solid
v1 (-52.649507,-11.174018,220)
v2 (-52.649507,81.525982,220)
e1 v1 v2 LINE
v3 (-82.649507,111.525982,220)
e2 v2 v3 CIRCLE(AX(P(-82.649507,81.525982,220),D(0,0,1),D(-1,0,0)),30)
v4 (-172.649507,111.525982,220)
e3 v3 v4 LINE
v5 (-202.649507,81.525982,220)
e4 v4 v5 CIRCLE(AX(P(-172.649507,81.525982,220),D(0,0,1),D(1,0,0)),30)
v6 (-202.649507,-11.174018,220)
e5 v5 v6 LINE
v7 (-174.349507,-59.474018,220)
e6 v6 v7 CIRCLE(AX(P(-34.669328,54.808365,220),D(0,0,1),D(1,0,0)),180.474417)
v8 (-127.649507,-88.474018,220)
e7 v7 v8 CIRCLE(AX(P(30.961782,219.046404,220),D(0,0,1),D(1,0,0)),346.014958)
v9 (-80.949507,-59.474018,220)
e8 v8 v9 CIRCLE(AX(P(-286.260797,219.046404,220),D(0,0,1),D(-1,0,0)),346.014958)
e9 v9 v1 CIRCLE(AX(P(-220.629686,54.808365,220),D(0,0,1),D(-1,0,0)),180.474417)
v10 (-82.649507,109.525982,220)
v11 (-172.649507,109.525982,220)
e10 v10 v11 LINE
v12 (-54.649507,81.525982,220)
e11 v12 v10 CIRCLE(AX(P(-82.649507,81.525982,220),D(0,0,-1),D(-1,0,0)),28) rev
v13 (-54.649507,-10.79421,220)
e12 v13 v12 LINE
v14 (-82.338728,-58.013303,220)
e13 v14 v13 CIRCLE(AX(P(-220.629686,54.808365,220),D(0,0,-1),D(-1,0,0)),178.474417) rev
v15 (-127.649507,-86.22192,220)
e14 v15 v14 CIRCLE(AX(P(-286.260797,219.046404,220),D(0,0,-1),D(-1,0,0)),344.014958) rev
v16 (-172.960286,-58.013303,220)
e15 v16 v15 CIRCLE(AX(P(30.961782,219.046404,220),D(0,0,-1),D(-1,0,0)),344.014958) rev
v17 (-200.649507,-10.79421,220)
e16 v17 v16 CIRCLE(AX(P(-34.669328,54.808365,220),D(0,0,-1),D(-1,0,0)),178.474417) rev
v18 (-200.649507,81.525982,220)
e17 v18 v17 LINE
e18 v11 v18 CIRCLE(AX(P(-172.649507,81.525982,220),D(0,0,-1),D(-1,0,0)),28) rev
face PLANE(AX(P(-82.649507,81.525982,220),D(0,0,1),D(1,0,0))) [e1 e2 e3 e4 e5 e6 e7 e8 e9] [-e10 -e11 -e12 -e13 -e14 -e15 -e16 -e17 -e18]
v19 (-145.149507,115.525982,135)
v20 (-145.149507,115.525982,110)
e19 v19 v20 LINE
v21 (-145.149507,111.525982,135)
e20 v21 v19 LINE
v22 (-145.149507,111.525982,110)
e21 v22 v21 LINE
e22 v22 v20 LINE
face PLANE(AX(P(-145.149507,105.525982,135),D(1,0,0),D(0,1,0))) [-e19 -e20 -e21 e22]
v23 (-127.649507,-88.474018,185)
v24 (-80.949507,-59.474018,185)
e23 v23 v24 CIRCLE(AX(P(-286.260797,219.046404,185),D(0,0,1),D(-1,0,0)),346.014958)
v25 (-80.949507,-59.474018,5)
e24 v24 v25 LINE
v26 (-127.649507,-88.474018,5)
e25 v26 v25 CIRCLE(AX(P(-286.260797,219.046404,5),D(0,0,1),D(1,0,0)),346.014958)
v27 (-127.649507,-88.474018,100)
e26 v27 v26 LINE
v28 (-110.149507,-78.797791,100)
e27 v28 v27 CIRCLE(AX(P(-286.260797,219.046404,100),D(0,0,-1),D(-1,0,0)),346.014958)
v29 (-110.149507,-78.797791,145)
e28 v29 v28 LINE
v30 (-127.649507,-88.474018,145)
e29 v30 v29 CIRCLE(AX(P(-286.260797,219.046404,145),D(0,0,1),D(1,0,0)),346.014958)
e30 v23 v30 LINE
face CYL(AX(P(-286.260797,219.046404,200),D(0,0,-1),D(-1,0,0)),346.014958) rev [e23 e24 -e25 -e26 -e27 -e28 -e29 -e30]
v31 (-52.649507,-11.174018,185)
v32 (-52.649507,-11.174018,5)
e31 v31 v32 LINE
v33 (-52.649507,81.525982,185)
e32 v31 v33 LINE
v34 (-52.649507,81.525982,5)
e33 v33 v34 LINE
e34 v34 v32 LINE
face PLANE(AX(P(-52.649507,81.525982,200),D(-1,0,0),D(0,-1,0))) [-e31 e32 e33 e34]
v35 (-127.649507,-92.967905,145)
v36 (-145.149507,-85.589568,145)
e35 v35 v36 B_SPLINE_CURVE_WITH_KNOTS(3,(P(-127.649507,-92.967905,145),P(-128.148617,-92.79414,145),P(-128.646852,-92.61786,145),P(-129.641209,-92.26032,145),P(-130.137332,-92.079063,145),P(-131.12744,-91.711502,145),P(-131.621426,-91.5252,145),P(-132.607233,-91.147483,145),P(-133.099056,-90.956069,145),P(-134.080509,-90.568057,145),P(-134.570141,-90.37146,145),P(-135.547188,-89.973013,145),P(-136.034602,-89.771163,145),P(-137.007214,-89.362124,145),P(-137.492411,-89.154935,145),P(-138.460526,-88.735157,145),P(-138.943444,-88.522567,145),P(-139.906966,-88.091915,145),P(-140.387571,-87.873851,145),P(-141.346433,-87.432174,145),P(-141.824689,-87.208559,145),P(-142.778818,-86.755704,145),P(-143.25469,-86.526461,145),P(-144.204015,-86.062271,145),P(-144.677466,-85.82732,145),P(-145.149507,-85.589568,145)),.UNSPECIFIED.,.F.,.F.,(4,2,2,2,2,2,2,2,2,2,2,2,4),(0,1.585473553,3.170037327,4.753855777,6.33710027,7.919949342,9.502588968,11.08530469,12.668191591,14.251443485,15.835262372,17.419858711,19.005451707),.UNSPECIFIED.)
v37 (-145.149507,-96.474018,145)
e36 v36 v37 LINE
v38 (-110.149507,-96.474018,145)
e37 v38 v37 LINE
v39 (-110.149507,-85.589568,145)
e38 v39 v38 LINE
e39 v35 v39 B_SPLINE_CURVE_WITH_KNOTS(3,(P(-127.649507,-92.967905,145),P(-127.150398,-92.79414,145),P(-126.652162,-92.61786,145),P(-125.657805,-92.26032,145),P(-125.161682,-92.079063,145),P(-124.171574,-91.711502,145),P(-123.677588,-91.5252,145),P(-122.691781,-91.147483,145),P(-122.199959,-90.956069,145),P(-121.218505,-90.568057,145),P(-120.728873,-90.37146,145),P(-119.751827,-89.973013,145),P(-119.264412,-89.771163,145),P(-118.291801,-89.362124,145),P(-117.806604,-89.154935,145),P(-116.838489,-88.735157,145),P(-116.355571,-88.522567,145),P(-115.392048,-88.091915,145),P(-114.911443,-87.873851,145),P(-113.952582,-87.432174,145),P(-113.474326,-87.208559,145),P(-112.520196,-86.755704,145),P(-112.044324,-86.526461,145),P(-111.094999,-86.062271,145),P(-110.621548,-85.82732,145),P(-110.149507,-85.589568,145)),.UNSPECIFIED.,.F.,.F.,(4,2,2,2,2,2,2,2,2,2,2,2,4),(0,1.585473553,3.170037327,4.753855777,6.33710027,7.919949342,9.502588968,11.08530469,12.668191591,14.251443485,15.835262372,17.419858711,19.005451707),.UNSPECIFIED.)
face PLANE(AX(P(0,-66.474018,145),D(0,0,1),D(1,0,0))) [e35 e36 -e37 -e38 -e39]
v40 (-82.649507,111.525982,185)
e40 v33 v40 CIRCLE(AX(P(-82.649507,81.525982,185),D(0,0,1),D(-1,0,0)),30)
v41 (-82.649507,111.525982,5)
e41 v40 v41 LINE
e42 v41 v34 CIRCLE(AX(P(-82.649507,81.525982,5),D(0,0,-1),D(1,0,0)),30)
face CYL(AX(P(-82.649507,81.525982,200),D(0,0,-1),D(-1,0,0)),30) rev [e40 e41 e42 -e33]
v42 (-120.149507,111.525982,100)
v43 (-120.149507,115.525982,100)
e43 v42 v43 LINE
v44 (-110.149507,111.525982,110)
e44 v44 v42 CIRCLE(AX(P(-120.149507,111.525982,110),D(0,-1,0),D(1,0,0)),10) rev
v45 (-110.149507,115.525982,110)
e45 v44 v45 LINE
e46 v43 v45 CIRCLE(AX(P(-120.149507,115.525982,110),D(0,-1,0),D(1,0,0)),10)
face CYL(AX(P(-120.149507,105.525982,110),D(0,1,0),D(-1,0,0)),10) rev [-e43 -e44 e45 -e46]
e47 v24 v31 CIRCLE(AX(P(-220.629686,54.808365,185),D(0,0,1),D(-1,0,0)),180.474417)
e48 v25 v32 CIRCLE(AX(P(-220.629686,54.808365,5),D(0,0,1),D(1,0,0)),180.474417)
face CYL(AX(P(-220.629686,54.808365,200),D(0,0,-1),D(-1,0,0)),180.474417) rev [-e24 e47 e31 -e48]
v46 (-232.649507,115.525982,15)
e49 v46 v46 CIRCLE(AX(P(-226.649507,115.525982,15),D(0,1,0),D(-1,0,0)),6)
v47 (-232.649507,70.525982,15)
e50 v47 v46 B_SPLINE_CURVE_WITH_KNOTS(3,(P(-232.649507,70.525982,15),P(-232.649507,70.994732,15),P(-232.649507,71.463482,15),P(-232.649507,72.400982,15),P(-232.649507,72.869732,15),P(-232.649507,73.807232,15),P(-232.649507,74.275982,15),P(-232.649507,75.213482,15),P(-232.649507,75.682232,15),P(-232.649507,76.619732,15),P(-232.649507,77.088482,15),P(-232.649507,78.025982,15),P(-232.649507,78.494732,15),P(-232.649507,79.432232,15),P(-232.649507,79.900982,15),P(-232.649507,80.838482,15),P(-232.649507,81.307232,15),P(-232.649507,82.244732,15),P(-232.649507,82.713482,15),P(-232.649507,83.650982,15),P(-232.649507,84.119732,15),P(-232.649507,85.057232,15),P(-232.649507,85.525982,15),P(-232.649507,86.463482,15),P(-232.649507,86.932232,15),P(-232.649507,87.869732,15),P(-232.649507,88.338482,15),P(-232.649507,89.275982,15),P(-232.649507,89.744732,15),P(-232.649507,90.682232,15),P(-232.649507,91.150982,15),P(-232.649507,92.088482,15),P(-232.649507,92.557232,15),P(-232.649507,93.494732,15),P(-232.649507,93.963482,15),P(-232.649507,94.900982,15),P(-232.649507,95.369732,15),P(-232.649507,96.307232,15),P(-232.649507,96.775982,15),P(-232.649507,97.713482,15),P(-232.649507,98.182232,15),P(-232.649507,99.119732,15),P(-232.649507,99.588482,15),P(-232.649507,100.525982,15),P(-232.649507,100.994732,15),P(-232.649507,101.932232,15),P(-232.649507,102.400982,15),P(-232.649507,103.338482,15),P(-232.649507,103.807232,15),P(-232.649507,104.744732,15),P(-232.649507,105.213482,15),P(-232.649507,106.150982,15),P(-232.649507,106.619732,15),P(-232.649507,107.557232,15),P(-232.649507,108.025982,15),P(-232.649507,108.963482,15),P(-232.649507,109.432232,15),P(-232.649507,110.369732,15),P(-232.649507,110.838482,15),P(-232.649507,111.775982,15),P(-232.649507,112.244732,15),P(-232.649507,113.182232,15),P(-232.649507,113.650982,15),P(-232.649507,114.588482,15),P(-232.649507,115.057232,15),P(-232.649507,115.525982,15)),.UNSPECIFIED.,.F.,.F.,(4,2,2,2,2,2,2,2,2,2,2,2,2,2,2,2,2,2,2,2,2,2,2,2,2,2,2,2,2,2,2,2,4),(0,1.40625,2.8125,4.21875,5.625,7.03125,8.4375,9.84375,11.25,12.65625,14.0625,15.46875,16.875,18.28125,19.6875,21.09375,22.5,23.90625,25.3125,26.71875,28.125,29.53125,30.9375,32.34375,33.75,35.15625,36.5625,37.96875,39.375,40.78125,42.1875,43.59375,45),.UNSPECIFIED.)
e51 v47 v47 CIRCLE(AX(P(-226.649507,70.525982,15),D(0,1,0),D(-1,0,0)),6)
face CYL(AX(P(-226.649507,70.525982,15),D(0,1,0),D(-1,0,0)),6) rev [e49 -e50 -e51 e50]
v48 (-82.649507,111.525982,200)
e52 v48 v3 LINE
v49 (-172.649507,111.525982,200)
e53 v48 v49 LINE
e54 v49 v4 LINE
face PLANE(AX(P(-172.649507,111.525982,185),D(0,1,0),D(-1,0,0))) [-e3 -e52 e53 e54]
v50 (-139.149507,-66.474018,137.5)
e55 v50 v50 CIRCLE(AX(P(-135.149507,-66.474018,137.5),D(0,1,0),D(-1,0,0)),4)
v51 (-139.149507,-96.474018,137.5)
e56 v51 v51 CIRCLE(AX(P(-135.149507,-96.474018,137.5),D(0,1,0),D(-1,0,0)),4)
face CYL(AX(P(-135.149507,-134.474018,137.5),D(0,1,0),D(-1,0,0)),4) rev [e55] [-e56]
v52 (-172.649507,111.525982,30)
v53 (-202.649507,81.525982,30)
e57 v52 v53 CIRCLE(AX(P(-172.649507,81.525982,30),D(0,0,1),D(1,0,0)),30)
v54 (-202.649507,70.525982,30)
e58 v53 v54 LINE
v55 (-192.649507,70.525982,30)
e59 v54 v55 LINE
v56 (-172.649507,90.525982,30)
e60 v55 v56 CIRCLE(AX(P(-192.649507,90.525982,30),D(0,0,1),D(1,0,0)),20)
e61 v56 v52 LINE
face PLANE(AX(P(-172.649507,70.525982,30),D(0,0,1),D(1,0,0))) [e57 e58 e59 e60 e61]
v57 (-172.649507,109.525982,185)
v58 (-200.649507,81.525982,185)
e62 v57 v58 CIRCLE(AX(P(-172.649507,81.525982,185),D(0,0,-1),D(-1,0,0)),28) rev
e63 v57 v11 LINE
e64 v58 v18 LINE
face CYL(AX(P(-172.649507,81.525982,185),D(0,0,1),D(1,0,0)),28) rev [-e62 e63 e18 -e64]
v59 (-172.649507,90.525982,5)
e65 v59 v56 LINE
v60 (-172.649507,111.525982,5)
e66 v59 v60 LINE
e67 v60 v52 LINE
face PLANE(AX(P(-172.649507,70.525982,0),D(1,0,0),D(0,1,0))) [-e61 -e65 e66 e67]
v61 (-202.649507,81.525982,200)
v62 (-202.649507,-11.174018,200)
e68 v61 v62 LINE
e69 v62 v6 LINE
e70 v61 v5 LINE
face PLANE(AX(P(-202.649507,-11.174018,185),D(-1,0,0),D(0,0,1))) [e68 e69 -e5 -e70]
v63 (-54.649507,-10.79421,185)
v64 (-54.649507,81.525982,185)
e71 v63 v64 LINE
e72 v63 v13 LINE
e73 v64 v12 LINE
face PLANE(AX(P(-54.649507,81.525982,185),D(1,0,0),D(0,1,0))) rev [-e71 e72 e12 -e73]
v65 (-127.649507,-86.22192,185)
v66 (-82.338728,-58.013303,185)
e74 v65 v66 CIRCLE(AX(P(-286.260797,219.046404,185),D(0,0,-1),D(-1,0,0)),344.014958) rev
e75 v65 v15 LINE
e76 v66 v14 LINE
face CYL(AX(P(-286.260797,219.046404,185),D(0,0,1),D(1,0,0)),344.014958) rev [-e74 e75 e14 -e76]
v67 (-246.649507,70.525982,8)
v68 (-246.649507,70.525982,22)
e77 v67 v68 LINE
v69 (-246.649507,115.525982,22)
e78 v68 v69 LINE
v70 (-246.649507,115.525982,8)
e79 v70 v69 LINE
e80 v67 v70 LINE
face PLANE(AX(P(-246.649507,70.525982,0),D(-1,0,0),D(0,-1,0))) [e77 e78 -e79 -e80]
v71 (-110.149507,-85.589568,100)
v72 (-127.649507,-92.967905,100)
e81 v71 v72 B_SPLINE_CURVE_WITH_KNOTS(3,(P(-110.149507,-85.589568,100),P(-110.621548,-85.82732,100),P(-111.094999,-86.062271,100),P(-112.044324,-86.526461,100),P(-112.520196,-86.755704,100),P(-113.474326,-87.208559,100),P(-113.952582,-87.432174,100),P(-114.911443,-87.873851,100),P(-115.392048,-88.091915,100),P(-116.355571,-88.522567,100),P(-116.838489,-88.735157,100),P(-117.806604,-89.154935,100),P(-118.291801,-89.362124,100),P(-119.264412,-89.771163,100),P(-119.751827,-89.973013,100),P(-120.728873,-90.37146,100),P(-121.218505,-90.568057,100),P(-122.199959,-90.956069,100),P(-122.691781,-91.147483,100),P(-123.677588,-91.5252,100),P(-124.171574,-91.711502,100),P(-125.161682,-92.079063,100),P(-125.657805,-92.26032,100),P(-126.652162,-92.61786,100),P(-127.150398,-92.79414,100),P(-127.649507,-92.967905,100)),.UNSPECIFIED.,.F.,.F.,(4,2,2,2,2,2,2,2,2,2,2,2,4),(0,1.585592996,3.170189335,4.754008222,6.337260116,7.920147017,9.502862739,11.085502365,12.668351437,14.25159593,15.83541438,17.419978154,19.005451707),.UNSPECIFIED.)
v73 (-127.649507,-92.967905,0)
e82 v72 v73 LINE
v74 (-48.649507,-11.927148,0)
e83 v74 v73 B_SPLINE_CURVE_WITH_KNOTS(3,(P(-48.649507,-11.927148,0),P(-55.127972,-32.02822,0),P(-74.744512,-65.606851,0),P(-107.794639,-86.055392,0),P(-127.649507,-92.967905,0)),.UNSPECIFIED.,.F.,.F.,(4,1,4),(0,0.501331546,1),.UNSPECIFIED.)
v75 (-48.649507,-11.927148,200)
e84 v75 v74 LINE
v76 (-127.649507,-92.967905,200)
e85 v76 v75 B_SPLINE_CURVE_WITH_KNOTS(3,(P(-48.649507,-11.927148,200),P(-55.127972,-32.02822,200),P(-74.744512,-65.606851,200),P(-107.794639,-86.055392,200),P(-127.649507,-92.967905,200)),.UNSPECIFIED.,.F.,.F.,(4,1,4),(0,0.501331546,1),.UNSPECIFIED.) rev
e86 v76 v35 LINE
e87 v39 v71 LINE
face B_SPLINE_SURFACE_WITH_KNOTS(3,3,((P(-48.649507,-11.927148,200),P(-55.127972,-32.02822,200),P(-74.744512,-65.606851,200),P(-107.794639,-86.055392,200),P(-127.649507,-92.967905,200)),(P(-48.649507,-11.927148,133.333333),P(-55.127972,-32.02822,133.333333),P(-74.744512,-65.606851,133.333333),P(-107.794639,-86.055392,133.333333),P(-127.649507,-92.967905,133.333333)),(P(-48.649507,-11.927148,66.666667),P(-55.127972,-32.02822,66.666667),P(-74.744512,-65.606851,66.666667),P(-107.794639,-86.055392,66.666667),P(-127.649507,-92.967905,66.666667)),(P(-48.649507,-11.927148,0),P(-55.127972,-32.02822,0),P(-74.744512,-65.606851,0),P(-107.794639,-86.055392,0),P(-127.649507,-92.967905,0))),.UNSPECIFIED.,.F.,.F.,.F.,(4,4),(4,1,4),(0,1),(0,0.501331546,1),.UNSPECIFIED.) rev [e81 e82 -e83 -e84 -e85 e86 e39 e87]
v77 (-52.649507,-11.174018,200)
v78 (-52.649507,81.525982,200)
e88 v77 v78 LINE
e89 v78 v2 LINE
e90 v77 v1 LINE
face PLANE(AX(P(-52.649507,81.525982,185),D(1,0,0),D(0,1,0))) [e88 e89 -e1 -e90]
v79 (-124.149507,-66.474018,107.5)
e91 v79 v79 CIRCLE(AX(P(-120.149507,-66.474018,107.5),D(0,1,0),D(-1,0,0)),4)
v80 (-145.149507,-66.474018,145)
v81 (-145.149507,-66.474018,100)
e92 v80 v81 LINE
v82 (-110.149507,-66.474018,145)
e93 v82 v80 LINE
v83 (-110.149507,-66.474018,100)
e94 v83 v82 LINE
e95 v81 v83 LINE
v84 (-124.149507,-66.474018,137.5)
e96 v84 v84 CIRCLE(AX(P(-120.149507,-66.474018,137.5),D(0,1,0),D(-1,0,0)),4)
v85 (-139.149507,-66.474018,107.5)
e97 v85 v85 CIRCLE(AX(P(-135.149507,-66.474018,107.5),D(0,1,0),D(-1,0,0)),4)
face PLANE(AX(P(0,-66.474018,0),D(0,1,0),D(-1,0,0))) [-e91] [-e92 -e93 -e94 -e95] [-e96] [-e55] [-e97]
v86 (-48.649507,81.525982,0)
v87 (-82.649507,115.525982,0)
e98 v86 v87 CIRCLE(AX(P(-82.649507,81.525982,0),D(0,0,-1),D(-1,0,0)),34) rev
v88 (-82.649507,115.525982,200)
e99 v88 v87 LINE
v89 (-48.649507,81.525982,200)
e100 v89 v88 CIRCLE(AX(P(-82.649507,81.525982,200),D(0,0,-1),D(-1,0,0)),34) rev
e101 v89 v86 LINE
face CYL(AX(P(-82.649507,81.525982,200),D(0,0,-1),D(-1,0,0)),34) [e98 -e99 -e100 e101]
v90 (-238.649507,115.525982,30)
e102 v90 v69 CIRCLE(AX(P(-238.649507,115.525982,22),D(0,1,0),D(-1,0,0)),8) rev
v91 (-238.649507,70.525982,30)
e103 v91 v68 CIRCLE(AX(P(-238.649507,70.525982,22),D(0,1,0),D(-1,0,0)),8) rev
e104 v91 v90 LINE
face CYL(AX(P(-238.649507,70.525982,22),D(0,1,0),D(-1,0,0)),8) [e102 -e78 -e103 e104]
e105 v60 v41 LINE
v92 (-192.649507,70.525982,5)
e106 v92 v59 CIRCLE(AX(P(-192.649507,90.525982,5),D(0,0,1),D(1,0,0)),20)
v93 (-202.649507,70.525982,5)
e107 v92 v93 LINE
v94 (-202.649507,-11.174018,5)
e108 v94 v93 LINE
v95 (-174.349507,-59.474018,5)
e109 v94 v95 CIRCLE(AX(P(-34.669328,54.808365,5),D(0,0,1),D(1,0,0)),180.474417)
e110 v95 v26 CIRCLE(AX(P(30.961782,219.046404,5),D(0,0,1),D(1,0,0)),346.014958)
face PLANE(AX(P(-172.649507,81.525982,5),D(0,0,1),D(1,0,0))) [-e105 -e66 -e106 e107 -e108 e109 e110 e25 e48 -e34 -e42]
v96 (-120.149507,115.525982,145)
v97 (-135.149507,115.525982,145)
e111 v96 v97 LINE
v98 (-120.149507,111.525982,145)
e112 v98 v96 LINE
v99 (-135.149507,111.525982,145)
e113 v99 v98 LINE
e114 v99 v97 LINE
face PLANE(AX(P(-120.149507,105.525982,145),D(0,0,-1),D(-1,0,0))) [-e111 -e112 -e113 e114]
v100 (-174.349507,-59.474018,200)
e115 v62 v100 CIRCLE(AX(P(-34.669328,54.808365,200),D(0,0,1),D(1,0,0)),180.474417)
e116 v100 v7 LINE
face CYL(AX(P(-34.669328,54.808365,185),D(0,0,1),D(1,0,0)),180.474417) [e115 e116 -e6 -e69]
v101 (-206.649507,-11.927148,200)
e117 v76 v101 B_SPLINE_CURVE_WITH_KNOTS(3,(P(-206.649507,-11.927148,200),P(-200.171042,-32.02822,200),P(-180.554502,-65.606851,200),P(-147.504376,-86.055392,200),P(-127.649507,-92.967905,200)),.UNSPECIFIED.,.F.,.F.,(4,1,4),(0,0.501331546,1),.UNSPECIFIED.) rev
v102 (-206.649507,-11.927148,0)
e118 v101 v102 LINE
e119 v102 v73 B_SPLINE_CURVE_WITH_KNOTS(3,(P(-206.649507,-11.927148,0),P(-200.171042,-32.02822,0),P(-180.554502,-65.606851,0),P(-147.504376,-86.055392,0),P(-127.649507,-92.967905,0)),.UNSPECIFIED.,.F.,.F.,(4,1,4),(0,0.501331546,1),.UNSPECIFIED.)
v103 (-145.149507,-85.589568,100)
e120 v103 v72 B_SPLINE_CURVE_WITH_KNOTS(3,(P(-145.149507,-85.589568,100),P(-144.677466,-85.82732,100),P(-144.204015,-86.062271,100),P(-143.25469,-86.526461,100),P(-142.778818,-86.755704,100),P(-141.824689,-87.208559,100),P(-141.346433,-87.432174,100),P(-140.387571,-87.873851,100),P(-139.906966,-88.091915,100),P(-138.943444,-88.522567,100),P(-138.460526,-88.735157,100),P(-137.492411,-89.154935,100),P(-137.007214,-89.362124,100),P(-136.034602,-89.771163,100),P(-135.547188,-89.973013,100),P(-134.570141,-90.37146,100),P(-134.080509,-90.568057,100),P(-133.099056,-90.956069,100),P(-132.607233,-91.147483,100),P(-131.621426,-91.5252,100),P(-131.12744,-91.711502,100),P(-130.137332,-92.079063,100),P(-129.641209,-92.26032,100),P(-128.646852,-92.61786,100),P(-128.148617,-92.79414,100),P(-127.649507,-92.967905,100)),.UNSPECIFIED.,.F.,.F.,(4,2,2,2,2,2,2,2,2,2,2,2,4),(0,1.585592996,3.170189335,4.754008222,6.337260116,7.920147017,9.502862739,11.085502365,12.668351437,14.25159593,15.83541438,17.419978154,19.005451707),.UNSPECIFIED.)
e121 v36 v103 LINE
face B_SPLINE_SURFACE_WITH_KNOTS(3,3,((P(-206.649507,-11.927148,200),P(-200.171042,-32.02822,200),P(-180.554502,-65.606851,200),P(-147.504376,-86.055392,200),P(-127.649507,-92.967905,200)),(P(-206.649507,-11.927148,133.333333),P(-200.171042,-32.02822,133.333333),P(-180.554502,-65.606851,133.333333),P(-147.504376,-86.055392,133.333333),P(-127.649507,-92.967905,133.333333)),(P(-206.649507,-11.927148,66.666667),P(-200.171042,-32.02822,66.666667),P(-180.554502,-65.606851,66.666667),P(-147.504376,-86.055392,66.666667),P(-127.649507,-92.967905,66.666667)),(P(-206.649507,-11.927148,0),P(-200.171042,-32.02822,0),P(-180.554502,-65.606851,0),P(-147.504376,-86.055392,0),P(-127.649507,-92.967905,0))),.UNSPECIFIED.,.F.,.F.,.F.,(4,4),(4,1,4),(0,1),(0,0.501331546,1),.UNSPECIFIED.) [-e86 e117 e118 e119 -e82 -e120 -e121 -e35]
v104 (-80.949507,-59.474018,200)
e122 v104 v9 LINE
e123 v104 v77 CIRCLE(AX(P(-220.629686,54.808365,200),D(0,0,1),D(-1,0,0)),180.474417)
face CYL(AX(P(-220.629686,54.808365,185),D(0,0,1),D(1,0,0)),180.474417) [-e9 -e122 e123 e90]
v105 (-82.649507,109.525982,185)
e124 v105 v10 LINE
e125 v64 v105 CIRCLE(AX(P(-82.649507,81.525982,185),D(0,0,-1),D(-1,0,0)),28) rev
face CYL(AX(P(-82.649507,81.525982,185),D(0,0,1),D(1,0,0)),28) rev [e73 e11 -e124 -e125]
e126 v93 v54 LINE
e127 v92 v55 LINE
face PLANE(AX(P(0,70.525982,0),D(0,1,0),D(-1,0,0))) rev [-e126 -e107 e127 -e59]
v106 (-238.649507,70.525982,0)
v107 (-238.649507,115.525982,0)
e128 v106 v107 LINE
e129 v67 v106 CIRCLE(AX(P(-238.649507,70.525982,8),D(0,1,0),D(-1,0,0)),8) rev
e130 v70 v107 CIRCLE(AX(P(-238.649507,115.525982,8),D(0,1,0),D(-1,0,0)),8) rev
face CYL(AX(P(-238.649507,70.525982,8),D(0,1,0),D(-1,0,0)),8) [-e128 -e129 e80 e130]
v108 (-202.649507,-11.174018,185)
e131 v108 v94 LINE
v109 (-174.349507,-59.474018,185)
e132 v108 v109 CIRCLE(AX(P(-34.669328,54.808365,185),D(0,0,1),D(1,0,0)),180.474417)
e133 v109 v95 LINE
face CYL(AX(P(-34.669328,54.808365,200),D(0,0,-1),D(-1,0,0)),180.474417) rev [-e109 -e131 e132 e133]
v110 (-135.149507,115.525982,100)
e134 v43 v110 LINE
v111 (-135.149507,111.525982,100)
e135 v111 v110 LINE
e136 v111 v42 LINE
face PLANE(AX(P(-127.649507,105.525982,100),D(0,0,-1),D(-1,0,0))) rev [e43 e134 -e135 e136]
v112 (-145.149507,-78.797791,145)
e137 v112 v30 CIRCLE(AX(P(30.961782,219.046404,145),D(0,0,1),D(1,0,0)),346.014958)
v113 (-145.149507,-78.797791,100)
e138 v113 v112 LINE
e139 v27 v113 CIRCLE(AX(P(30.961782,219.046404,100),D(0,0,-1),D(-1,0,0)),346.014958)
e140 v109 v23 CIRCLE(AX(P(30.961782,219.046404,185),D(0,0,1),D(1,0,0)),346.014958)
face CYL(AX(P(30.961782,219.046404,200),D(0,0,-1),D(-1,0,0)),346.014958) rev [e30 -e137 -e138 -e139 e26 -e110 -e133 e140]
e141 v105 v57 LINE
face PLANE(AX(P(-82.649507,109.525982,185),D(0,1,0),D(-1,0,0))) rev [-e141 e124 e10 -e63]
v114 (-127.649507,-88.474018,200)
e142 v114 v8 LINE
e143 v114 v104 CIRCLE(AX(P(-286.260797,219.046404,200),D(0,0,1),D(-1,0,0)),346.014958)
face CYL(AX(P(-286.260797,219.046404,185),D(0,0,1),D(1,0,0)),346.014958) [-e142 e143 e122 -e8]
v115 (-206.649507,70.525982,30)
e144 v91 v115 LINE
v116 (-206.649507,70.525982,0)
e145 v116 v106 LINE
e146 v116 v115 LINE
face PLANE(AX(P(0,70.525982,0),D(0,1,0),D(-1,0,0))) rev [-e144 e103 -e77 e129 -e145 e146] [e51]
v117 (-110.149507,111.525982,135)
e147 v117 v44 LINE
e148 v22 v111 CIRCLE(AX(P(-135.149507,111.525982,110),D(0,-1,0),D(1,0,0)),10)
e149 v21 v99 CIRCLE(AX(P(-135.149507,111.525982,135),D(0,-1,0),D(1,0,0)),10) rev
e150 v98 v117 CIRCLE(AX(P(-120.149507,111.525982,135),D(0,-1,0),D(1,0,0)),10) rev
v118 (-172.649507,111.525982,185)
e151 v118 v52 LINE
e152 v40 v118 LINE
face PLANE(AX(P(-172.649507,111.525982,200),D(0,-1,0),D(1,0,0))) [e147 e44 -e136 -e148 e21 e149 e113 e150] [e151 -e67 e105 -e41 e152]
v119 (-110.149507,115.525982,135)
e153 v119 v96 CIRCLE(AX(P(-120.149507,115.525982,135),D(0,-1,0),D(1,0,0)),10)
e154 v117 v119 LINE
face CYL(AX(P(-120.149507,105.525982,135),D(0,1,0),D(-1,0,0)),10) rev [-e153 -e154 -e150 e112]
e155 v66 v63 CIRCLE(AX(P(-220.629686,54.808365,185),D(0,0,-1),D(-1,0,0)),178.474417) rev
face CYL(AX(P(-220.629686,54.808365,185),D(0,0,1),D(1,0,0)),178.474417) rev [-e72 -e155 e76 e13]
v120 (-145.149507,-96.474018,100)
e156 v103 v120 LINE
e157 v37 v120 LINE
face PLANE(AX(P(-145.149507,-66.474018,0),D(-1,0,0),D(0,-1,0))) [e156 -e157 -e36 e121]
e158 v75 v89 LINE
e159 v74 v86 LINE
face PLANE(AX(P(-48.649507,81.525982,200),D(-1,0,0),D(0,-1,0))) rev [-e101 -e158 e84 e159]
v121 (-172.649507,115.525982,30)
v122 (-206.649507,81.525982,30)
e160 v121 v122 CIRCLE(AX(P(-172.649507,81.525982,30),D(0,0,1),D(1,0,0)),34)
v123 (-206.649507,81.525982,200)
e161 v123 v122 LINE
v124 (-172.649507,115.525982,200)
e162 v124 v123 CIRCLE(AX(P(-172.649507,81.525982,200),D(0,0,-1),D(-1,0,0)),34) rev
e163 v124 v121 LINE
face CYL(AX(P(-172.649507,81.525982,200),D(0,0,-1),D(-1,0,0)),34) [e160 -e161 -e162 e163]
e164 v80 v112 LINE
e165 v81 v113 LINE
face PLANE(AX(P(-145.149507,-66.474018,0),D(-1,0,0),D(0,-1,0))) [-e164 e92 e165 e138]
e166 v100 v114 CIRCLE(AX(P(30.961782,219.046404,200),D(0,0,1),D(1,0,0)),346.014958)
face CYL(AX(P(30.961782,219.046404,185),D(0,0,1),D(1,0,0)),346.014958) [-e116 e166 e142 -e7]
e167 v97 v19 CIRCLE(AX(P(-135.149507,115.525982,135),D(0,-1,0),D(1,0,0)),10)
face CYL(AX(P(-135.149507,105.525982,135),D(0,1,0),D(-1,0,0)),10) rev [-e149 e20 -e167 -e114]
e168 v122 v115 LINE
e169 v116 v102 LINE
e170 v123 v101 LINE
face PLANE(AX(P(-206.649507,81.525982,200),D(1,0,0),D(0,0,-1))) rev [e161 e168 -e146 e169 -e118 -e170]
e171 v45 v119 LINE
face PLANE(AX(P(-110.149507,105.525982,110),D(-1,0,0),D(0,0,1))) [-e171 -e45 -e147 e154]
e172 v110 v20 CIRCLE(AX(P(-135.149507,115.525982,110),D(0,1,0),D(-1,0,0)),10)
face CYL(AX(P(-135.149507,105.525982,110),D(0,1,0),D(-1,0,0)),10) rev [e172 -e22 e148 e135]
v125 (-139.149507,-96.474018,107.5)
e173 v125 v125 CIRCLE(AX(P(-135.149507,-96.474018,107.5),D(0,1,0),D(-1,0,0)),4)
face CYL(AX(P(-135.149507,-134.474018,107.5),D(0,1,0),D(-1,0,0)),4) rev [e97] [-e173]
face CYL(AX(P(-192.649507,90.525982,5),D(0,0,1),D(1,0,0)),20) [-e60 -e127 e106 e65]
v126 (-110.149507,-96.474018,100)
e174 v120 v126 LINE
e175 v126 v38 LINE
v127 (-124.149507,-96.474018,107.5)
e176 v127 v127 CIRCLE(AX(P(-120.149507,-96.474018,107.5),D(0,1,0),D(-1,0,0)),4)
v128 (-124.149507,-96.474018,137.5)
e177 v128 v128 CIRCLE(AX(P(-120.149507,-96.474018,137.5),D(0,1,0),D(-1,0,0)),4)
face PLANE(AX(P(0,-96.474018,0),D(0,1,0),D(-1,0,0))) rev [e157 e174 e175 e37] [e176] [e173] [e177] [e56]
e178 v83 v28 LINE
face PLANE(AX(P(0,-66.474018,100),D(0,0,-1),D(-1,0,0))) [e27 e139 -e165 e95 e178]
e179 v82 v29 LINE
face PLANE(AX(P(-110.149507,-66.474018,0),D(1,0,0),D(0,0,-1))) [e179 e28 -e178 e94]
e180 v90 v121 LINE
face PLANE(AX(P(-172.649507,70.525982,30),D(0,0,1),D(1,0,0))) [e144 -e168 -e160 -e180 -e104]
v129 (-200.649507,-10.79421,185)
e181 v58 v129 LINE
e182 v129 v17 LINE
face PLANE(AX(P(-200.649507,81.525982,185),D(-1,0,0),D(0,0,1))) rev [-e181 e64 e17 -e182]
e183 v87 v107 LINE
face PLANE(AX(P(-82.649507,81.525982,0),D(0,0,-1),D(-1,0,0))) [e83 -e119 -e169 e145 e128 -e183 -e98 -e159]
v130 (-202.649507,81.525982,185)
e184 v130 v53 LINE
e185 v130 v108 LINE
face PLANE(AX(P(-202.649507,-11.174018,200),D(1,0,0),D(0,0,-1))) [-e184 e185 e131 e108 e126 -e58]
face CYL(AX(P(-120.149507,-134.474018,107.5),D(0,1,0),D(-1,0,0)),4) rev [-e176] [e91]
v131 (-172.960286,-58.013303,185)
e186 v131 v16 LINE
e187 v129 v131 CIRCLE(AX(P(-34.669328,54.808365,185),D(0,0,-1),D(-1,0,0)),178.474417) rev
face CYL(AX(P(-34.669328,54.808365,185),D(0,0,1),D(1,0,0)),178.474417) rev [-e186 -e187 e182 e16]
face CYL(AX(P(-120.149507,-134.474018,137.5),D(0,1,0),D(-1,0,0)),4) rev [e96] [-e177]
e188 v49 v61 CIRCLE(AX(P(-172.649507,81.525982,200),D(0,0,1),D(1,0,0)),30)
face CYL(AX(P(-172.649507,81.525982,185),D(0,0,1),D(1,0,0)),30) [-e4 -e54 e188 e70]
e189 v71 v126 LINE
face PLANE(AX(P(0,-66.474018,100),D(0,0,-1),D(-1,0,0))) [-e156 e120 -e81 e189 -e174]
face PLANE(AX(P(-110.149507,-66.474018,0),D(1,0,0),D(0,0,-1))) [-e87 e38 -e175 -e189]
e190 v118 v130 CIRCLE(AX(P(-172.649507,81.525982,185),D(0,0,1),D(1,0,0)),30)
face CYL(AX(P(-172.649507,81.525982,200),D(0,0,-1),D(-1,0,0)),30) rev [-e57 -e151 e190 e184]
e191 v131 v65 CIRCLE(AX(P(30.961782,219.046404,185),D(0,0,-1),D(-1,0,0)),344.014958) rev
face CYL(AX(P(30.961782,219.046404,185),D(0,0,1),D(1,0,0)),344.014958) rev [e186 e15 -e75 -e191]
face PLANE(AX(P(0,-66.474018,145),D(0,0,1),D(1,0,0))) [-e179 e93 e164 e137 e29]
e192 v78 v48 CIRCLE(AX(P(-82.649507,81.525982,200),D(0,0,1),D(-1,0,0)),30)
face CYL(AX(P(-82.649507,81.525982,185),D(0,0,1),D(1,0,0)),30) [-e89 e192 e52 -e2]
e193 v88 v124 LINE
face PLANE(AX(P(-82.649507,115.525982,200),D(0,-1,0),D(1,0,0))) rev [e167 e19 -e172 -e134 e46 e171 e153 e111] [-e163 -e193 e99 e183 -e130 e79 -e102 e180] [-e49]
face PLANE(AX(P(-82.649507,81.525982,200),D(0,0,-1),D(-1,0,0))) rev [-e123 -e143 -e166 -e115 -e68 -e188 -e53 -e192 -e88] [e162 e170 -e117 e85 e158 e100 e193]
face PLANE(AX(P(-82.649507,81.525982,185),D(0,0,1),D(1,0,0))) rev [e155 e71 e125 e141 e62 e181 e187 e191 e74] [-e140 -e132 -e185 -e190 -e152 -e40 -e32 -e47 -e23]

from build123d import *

# Parameters (mm, degrees)
EXTRU_MINCE2_DEPTH       = 200
EPAISSIR5_DEPTH          = 200
EPAISSIR7_DEPTH          = 200
EXTRU_MINCE3_DEPTH       = 20
EXTRU_MINCE3_DEPTH_BACK  = 15
BOSS_EXTRU_2_DEPTH       = 5
ENL_V_MAT_EXTRU_1_DEPTH  = 10
BOSS_EXTRU_3_START       = -212
ESQUISSE12_W             = 35
ESQUISSE12_H             = 45
BOSS_EXTRU_3_DEPTH       = 30
ESQUISSE13_R             = 4
ENL_V_MAT_EXTRU_2_DEPTH  = 250
BOSS_EXTRU_6_DEPTH       = 45
ESQUISSE25_R             = 6
ENL_V_MAT_EXTRU_8_DEPTH  = 45
ENL_V_MAT_EXTRU_9_DEPTH  = 45
ENL_V_MAT_EXTRU_10_DEPTH = 25


# Read off the part's stored shape, not the designer's step: Epaissir5, Epaissir7
with BuildPart() as part:
    # Esquisse3 → Extru.-Mince2 (new body)
    with BuildSketch(Plane.XY):
        with BuildLine():
            Line((-206.649507199, -11.92714811), (-206.649507199, -3.47401752))
            Line((-206.649507199, -3.47401752), (-206.649507199, 81.52598248))
            ThreePointArc((-206.649507199, 81.52598248), (-196.691137759, 105.56761304), (-172.649507199, 115.52598248))
            Line((-172.649507199, 115.52598248), (-82.649507199, 115.52598248))
            ThreePointArc((-82.649507199, 115.52598248), (-58.607876638, 105.56761304), (-48.649507199, 81.52598248))
            Line((-48.649507199, 81.52598248), (-48.649507199, -11.92714811))
            ThreePointArc((-48.649507199, -11.92714811), (-61.399009455, -38.338842544), (-78.173060849, -62.396244951))
            ThreePointArc((-78.173060849, -62.396244951), (-102.275198337, -78.711501116), (-127.649507199, -92.967905467))
            ThreePointArc((-127.649507199, -92.967905467), (-153.023816061, -78.711501116), (-177.125953549, -62.396244951))
            ThreePointArc((-177.125953549, -62.396244951), (-193.900004942, -38.338842544), (-206.649507199, -11.92714811))
        make_face()
        with BuildLine():
            Line((-202.649507199, -11.17401752), (-202.649507199, -3.47401752))
            Line((-202.649507199, -3.47401752), (-202.649507199, 81.52598248))
            ThreePointArc((-202.649507199, 81.52598248), (-193.862710634, 102.739185916), (-172.649507199, 111.52598248))
            Line((-172.649507199, 111.52598248), (-82.649507199, 111.52598248))
            ThreePointArc((-82.649507199, 111.52598248), (-61.436303763, 102.739185916), (-52.649507199, 81.52598248))
            Line((-52.649507199, 81.52598248), (-52.649507199, -11.17401752))
            ThreePointArc((-52.649507199, -11.17401752), (-64.915375774, -36.427970301), (-80.949507199, -59.47401752))
            ThreePointArc((-80.949507199, -59.47401752), (-103.722688687, -74.902894226), (-127.649507199, -88.47401752))
            ThreePointArc((-127.649507199, -88.47401752), (-151.57632571, -74.902894226), (-174.349507199, -59.47401752))
            ThreePointArc((-174.349507199, -59.47401752), (-190.383638623, -36.427970301), (-202.649507199, -11.17401752))
        make_face(mode=Mode.SUBTRACT)
    extrude(amount=EXTRU_MINCE2_DEPTH)

    # Epaissir5 outline → Epaissir5 (add)
    with BuildSketch(Plane.XY):
        with BuildLine():
            add(Edge.make_bspline(
                [(-78.173060849, -62.396244951), (-91.313583381, -75.858349648), (-107.794638855, -86.055391974), (-127.649507199, -92.967905467)],
                knots=[0.501331546, 0.501331546, 0.501331546, 0.501331546, 1, 1, 1, 1], degree=3))
            ThreePointArc((-78.173060849, -62.396244951), (-102.275198337, -78.711501116), (-127.649507199, -92.967905467))
        make_face()
        with BuildLine():
            add(Edge.make_bspline(
                [(-48.649507199, -11.92714811), (-55.127972189, -32.028220402), (-64.962362616, -48.862247174), (-78.173060849, -62.396244951)],
                knots=[0, 0, 0, 0, 0.501331546, 0.501331546, 0.501331546, 0.501331546], degree=3))
            ThreePointArc((-48.649507199, -11.92714811), (-61.399009455, -38.338842545), (-78.173060849, -62.396244951))
        make_face()
    extrude(amount=EPAISSIR5_DEPTH)

    # Epaissir7 outline → Epaissir7 (add)
    with BuildSketch(Plane.XY):
        with BuildLine():
            ThreePointArc((-177.125953549, -62.396244951), (-193.900004942, -38.338842544), (-206.649507199, -11.92714811))
            add(Edge.make_bspline(
                [(-206.649507199, -11.92714811), (-200.171042209, -32.028220402), (-190.336651781, -48.862247174), (-177.125953549, -62.396244951)],
                knots=[0, 0, 0, 0, 0.501331546, 0.501331546, 0.501331546, 0.501331546], degree=3))
        make_face()
        with BuildLine():
            ThreePointArc((-127.649507199, -92.967905467), (-153.023816061, -78.711501116), (-177.125953549, -62.396244951))
            add(Edge.make_bspline(
                [(-177.125953549, -62.396244951), (-163.985431016, -75.858349648), (-147.504375542, -86.055391974), (-127.649507199, -92.967905467)],
                knots=[0.501331546, 0.501331546, 0.501331546, 0.501331546, 1, 1, 1, 1], degree=3))
        make_face()
    extrude(amount=EPAISSIR7_DEPTH)

    # Esquisse7 → Extru.-Mince3 (add, two sides: drawn at the far end of the back side and taken through both)
    with BuildSketch(Plane.XY.offset(200).offset(-EXTRU_MINCE3_DEPTH_BACK)):
        with BuildLine():
            Line((-202.649507199, -11.17401752), (-202.649507199, -3.47401752))
            Line((-202.649507199, -3.47401752), (-202.649507199, 81.52598248))
            ThreePointArc((-202.649507199, 81.52598248), (-193.862710634, 102.739185916), (-172.649507199, 111.52598248))
            Line((-172.649507199, 111.52598248), (-82.649507199, 111.52598248))
            ThreePointArc((-82.649507199, 111.52598248), (-61.436303763, 102.739185916), (-52.649507199, 81.52598248))
            Line((-52.649507199, 81.52598248), (-52.649507199, -11.17401752))
            ThreePointArc((-52.649507199, -11.17401752), (-64.915375774, -36.427970301), (-80.949507199, -59.47401752))
            ThreePointArc((-80.949507199, -59.47401752), (-103.722688687, -74.902894226), (-127.649507199, -88.47401752))
            ThreePointArc((-127.649507199, -88.47401752), (-151.57632571, -74.902894226), (-174.349507199, -59.47401752))
            ThreePointArc((-174.349507199, -59.47401752), (-190.383638623, -36.427970301), (-202.649507199, -11.17401752))
        make_face()
        with BuildLine():
            Line((-200.649507199, -10.794210022), (-200.649507199, -3.47401752))
            Line((-200.649507199, -3.47401752), (-200.649507199, 81.52598248))
            ThreePointArc((-200.649507199, 81.52598248), (-192.448497072, 101.324972353), (-172.649507199, 109.52598248))
            Line((-172.649507199, 109.52598248), (-82.649507199, 109.52598248))
            ThreePointArc((-82.649507199, 109.52598248), (-62.850517326, 101.324972353), (-54.649507199, 81.52598248))
            Line((-54.649507199, 81.52598248), (-54.649507199, -10.794210022))
            ThreePointArc((-54.649507199, -10.794210022), (-66.673062941, -35.471620796), (-82.338728425, -58.013302636))
            ThreePointArc((-82.338728425, -58.013302636), (-104.44621972, -72.997686116), (-127.649507199, -86.221920301))
            ThreePointArc((-127.649507199, -86.221920301), (-150.852794678, -72.997686116), (-172.960285972, -58.013302636))
            ThreePointArc((-172.960285972, -58.013302636), (-188.625951457, -35.471620796), (-200.649507199, -10.794210022))
        make_face(mode=Mode.SUBTRACT)
    extrude(amount=EXTRU_MINCE3_DEPTH + EXTRU_MINCE3_DEPTH_BACK)

    # Esquisse9 → Boss.-Extru.2 (add)
    with BuildSketch(Plane(origin=(0, 0, 0), x_dir=(-1, 0, 0), z_dir=(0, 0, -1))):
        with BuildLine():
            Line((172.649507199, 111.52598248), (82.649507199, 111.52598248))
            ThreePointArc((82.649507199, 111.52598248), (61.436303763, 102.739185916), (52.649507199, 81.52598248))
            Line((52.649507199, 81.52598248), (52.649507199, -11.17401752))
            ThreePointArc((52.649507199, -11.17401752), (79.415793498, -60.238358109), (127.649507199, -88.47401752))
            ThreePointArc((127.649507199, -88.47401752), (175.815578629, -60.172728481), (202.649507199, -11.17401752))
            Line((202.649507199, -11.17401752), (202.649507199, 81.52598248))
            ThreePointArc((202.649507199, 81.52598248), (193.862710634, 102.739185916), (172.649507199, 111.52598248))
        make_face()
    extrude(amount=-BOSS_EXTRU_2_DEPTH)

    # Esquisse10 → Enlèv. mat.-Extru.1 (cut)
    with BuildSketch(Plane(origin=(0, 115.52598248, 0), x_dir=(1, 0, 0), z_dir=(0, 1, 0))):
        with BuildLine():
            Line((-127.649507199, -100), (-120.149507199, -100))
            ThreePointArc((-120.149507199, -100), (-113.078439387, -102.928932188), (-110.149507199, -110))
            Line((-110.149507199, -110), (-110.149507199, -135))
            ThreePointArc((-110.149507199, -135), (-113.078439387, -142.071067812), (-120.149507199, -145))
            Line((-120.149507199, -145), (-135.149507199, -145))
            ThreePointArc((-135.149507199, -145), (-142.220575011, -142.071067812), (-145.149507199, -135))
            Line((-145.149507199, -135), (-145.149507199, -110))
            ThreePointArc((-145.149507199, -110), (-142.220575011, -102.928932188), (-135.149507199, -100))
            Line((-135.149507199, -100), (-127.649507199, -100))
        make_face()
    extrude(amount=-ENL_V_MAT_EXTRU_1_DEPTH, mode=Mode.SUBTRACT)

    # Esquisse12 → Boss.-Extru.3 (add)
    with BuildSketch(Plane(origin=(0, 115.52598248, 0), x_dir=(1, 0, 0), z_dir=(0, 1, 0)).offset(BOSS_EXTRU_3_START)):
        with Locations((-127.649507199, -122.5)):
            Rectangle(ESQUISSE12_W, ESQUISSE12_H)
    extrude(amount=BOSS_EXTRU_3_DEPTH)

    # Esquisse13 → Enlèv. mat.-Extru.2 (cut)
    with BuildSketch(Plane(origin=(0, 115.52598248, 0), x_dir=(1, 0, 0), z_dir=(0, 1, 0))):
        with Locations(Location((-120.149507199, -107.5, 0), (0, 0, 180))):
            Circle(ESQUISSE13_R)
        with Locations(Location((-135.149507199, -107.5, 0), (0, 0, 180))):
            Circle(ESQUISSE13_R)
        with Locations(Location((-135.149507199, -137.5, 0), (0, 0, 180))):
            Circle(ESQUISSE13_R)
        with Locations(Location((-120.149507199, -137.5, 0), (0, 0, 180))):
            Circle(ESQUISSE13_R)
    extrude(amount=-ENL_V_MAT_EXTRU_2_DEPTH, mode=Mode.SUBTRACT)

    # Esquisse23 → Boss.-Extru.6 (add)
    with BuildSketch(Plane(origin=(0, 115.52598248, 0), x_dir=(1, 0, 0), z_dir=(0, 1, 0))):
        Polygon((-172.649507199, 0), (-172.649507199, -30), (-206.649507199, -30), (-246.649507199, -30), (-246.649507199, 0), align=None)
    extrude(amount=-BOSS_EXTRU_6_DEPTH)

    # Esquisse25 → Enlèv. mat.-Extru.8 (cut)
    with BuildSketch(Plane(origin=(0, 115.52598248, 0), x_dir=(1, 0, 0), z_dir=(0, 1, 0))):
        with Locations(Location((-226.649507199, -15, 0), (0, 0, 180))):
            Circle(ESQUISSE25_R)
    extrude(amount=-ENL_V_MAT_EXTRU_8_DEPTH, mode=Mode.SUBTRACT)

    # Esquisse26 → Enlèv. mat.-Extru.9 (cut)
    with BuildSketch(Plane(origin=(0, 115.52598248, 0), x_dir=(1, 0, 0), z_dir=(0, 1, 0))):
        with BuildLine():
            Line((-246.649507199, 0), (-246.649507199, -8))
            ThreePointArc((-246.649507199, -8), (-244.306361448, -2.343145751), (-238.649507199, 0))
            Line((-238.649507199, 0), (-246.649507199, 0))
        make_face()
        with BuildLine():
            ThreePointArc((-238.649507199, -30), (-244.306361448, -27.656854249), (-246.649507199, -22))
            Line((-246.649507199, -22), (-246.649507199, -30))
            Line((-246.649507199, -30), (-238.649507199, -30))
        make_face()
    extrude(amount=-ENL_V_MAT_EXTRU_9_DEPTH, mode=Mode.SUBTRACT)

    # Esquisse27 → Enlèv. mat.-Extru.10 (cut)
    with BuildSketch(Plane.XY.offset(30)):
        with BuildLine():
            Line((-172.649507199, 70.52598248), (-172.649507199, 90.52598248))
            ThreePointArc((-172.649507199, 90.52598248), (-178.507371575, 76.383846856), (-192.649507199, 70.52598248))
            Line((-192.649507199, 70.52598248), (-172.649507199, 70.52598248))
        make_face()
    extrude(amount=-ENL_V_MAT_EXTRU_10_DEPTH, mode=Mode.SUBTRACT)


solid = part.part
